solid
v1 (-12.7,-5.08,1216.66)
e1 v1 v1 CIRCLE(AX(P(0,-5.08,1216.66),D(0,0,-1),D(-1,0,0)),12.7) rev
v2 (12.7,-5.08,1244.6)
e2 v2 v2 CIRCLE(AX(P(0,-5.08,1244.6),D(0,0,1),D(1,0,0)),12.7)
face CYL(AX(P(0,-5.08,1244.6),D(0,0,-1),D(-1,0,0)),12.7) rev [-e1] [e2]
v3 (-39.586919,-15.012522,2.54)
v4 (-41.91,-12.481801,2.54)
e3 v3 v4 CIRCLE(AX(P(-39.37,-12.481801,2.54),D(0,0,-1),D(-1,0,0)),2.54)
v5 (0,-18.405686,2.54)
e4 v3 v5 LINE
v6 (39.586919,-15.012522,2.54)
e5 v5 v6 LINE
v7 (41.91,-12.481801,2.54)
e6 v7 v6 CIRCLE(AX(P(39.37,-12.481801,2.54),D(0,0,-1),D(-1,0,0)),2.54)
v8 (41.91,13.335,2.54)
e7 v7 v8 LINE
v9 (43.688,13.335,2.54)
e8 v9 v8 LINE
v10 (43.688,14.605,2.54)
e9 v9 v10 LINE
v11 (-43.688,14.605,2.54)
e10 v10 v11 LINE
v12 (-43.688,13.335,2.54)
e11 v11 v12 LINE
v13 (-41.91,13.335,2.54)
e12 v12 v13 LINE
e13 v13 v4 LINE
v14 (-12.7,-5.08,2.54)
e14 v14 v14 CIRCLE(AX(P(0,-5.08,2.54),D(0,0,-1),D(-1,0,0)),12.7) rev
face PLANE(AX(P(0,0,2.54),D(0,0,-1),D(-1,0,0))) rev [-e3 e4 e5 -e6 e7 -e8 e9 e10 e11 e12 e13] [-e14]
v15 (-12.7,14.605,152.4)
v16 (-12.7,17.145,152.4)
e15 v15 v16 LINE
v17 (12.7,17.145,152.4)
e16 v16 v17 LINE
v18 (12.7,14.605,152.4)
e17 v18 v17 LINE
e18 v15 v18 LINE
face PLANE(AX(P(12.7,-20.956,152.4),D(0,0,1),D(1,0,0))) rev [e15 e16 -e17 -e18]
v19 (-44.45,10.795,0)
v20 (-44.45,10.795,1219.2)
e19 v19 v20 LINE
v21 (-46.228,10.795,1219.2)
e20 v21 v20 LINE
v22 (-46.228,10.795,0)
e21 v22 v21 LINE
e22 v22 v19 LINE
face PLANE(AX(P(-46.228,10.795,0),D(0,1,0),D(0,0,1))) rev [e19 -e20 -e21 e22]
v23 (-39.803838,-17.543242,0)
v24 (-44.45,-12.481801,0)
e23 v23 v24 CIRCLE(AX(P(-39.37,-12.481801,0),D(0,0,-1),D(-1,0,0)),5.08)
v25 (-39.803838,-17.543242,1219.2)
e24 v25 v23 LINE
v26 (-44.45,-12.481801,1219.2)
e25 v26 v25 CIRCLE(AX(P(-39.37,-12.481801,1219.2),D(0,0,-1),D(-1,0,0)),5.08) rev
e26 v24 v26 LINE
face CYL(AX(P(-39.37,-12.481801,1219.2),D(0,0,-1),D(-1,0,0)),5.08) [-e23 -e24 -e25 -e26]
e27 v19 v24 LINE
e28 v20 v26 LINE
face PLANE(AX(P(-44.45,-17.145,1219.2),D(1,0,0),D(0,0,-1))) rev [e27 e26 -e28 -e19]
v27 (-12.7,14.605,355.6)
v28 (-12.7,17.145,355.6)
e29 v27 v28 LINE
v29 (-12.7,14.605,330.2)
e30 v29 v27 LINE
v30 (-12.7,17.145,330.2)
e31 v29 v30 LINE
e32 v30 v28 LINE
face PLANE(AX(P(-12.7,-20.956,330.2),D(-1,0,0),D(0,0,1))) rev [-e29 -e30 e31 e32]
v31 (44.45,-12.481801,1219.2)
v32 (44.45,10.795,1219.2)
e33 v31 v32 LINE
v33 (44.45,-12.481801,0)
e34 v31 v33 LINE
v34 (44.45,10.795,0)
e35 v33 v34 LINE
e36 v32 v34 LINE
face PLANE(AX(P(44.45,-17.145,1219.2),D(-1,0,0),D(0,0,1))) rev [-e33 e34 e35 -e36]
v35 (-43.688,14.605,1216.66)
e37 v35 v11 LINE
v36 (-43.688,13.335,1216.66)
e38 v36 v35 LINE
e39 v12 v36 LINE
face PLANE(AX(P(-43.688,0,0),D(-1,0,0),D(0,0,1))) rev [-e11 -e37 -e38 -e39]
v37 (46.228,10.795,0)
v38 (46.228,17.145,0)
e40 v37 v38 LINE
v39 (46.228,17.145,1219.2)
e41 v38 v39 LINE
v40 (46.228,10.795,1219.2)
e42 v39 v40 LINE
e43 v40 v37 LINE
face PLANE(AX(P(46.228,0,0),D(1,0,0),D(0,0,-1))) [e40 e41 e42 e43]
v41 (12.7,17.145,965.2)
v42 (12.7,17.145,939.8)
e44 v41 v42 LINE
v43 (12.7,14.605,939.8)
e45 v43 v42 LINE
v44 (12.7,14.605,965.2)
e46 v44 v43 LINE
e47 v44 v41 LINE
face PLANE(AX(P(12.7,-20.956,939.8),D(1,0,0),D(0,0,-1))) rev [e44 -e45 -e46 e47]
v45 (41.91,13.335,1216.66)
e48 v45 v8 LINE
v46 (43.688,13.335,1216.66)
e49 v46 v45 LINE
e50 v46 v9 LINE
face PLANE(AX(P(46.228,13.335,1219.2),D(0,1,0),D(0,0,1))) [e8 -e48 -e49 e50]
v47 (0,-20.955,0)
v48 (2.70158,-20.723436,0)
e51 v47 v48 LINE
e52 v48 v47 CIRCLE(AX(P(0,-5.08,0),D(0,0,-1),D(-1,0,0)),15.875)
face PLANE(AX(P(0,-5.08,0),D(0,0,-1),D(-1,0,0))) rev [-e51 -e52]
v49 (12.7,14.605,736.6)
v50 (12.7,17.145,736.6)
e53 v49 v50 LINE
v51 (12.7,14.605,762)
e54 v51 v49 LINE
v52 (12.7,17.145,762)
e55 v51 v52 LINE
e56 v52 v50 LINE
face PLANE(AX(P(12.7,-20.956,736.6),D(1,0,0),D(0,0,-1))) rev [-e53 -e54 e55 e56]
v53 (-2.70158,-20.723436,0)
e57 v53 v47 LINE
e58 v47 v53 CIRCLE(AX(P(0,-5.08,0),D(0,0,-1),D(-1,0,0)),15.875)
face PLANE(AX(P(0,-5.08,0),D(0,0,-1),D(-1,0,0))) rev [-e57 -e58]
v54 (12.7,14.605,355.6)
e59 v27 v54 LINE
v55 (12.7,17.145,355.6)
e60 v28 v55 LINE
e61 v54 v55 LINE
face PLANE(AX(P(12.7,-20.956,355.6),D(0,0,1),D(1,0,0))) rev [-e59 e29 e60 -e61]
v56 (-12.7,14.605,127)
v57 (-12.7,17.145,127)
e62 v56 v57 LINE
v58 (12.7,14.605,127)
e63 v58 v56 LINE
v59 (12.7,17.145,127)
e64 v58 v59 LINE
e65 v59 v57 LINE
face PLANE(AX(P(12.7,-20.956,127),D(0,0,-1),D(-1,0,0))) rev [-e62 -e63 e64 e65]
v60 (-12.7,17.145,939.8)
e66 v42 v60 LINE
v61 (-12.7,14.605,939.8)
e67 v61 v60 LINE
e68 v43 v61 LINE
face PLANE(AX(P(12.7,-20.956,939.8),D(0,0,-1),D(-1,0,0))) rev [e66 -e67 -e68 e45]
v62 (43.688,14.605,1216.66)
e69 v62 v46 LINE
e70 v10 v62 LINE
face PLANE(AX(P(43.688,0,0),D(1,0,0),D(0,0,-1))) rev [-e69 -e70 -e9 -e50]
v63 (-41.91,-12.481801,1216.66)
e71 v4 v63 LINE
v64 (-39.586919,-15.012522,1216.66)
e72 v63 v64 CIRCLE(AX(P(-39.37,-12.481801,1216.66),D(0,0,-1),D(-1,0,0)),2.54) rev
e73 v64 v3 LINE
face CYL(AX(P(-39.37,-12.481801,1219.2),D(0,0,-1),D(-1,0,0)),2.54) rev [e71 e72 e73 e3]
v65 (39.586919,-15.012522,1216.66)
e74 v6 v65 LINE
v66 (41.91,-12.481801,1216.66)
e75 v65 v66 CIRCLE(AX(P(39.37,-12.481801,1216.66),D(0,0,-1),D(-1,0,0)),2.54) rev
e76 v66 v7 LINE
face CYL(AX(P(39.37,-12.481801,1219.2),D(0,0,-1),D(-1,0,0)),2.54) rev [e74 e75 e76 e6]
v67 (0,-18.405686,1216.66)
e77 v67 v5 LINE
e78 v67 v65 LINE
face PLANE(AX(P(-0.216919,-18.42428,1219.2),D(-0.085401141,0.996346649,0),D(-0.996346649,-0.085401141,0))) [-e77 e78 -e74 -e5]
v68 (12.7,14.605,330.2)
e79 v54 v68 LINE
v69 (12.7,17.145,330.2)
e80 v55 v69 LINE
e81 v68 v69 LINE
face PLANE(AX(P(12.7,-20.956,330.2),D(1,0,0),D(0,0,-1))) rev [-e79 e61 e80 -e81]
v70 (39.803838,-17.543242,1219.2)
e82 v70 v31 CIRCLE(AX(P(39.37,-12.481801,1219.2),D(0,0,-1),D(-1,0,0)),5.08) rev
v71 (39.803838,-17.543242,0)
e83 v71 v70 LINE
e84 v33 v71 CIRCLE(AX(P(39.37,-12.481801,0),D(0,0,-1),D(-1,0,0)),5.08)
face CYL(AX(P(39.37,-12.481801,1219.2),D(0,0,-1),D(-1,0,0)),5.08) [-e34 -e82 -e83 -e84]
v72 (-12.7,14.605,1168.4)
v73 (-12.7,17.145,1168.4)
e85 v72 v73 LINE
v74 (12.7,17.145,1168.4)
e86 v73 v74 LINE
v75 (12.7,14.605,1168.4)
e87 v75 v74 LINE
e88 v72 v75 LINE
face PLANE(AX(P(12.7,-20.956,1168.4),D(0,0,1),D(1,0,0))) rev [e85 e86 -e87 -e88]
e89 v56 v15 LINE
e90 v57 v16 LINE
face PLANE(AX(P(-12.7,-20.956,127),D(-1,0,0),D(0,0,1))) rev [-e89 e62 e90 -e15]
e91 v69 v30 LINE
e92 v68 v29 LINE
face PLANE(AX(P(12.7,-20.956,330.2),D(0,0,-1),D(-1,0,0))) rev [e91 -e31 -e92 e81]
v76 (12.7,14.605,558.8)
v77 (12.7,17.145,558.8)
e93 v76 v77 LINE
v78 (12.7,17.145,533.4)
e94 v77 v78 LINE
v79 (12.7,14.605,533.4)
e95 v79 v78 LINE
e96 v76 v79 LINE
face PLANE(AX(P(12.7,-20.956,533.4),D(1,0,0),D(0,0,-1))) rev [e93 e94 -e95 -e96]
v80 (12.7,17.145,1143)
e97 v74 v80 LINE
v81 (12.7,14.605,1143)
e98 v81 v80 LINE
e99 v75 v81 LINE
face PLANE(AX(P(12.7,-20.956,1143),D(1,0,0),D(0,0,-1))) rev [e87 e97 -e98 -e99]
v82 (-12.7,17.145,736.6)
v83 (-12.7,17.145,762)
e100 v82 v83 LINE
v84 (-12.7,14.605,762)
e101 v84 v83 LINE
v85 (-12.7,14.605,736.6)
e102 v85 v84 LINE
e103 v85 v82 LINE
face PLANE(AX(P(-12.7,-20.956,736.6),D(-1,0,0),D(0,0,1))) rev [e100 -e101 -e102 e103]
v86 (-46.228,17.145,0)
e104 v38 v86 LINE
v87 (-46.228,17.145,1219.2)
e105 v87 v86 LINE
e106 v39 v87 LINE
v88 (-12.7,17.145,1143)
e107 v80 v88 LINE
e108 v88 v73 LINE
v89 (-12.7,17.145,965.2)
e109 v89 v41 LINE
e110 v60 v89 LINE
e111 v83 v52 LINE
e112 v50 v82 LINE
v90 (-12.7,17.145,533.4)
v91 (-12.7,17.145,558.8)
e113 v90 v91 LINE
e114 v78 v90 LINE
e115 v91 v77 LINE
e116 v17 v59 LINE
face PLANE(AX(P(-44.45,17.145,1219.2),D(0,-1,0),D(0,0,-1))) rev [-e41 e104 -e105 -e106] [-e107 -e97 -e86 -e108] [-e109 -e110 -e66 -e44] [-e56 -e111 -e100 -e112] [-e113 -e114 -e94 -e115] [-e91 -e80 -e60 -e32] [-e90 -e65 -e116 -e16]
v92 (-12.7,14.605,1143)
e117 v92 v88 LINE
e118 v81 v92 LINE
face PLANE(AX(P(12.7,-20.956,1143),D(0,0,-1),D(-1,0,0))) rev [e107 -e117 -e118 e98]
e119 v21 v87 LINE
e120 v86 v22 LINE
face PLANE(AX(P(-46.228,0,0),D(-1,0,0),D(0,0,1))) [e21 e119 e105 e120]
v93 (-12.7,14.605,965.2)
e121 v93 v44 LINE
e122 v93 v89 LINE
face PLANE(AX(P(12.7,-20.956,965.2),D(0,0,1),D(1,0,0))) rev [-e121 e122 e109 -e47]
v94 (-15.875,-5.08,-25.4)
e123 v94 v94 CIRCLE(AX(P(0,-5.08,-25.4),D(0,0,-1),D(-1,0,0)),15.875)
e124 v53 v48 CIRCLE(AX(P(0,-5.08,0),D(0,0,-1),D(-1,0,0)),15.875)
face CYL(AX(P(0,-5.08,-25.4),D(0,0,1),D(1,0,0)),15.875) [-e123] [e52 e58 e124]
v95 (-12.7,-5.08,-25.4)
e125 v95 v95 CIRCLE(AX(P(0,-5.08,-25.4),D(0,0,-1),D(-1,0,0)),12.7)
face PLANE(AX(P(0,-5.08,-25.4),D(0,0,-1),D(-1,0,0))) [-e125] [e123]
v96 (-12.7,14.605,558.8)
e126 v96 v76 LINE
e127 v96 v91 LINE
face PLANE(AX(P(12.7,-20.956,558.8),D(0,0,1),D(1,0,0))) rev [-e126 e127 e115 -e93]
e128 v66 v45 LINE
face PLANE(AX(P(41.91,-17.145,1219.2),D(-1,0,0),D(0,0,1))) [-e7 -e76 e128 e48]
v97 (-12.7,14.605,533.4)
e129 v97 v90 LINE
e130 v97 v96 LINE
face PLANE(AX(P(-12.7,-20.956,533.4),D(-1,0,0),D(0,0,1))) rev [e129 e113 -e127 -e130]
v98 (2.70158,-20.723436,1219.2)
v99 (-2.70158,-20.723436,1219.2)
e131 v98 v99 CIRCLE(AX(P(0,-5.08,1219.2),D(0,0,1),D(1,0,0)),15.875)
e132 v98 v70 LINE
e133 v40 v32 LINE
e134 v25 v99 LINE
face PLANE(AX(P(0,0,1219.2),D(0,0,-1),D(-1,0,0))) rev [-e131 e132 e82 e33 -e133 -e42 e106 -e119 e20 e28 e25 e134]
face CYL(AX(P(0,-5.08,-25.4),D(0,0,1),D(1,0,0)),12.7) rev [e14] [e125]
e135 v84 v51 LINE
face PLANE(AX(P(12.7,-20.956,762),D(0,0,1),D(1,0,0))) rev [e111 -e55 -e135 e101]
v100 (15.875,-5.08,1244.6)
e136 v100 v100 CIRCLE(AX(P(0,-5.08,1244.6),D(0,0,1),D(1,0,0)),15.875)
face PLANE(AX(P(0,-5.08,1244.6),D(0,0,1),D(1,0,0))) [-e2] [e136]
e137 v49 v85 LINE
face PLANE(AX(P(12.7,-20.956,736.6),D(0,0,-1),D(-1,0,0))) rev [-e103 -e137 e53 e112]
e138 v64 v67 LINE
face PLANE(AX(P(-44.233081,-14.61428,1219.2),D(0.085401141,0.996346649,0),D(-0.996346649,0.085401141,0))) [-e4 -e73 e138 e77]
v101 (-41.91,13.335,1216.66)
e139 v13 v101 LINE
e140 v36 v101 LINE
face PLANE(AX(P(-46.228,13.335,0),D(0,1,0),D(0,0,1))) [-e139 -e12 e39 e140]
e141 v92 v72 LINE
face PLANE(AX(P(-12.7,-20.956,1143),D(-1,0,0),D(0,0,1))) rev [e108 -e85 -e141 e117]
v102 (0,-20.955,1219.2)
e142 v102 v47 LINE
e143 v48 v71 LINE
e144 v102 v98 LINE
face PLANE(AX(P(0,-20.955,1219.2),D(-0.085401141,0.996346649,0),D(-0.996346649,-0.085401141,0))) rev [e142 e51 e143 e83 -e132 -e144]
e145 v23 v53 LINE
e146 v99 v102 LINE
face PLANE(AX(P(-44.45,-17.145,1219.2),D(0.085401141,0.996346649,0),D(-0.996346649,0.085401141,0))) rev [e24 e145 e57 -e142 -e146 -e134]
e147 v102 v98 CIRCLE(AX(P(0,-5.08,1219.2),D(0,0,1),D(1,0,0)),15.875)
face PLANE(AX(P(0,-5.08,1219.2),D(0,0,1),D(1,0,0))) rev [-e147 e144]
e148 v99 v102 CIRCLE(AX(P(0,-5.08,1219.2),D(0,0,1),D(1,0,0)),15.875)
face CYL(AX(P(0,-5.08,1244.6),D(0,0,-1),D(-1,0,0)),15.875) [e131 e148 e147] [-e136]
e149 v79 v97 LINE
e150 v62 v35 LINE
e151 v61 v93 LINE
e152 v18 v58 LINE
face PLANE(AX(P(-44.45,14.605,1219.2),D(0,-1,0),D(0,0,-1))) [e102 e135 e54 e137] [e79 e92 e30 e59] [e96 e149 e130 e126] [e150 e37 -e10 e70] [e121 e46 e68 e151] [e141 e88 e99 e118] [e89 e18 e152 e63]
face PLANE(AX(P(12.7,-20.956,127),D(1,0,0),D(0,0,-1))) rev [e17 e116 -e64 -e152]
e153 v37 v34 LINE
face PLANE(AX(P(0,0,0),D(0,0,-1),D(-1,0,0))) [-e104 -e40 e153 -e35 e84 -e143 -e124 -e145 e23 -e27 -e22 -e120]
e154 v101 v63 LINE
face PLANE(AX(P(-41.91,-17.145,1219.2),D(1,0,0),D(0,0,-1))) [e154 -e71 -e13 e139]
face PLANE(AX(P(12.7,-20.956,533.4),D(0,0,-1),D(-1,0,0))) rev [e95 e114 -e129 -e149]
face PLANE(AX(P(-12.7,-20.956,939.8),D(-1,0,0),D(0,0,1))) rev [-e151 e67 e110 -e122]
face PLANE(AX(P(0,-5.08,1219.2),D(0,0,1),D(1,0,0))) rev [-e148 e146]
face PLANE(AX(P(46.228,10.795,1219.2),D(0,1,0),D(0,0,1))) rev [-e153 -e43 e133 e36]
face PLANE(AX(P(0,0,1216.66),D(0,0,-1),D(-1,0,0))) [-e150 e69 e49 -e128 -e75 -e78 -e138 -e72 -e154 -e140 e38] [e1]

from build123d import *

# Parameters (mm, degrees)
BOSS_EXTRUDE1_DEPTH = 1219.2
SKETCH3_W           = 1219.2
SKETCH3_H           = 6.35
BOSS_EXTRUDE2_DEPTH = 1.778
SKETCH4_W           = 1219.2
SKETCH4_H           = 6.35
BOSS_EXTRUDE3_DEPTH = 1.778
FILLET1_R           = 5.08
SHELL1_START        = 2.54
SHELL1_DEPTH        = 1214.12
CUT_EXTRUDE1_REACH  = 1222.671
SKETCH6_W           = 25.4
SKETCH6_H           = 25.4
SKETCH7_R           = 15.875
SKETCH7_R_2         = 12.7
BOSS_EXTRUDE4_DEPTH = 25.4
CUT_EXTRUDE2_REACH  = 1222.256
SKETCH10_R          = 12.7
BOSS_EXTRUDE5_START = 25.4
SKETCH11_R          = 15.875
SKETCH11_R_2        = 12.7
BOSS_EXTRUDE5_DEPTH = 25.4
CUT_EXTRUDE3_REACH  = 1247.634
SKETCH12_R          = 12.7


# Read off the part's stored shape, not the designer's step: Shell1
with BuildPart() as part:
    # Sketch1 → Boss-Extrude1 (new body)
    with BuildSketch(Plane.XY):
        Polygon((-44.45, -17.145), (-44.45, 17.145), (44.45, 17.145), (44.45, -17.145), (0, -20.955), align=None)
    extrude(amount=BOSS_EXTRUDE1_DEPTH)

    # Sketch3 → Boss-Extrude2 (add)
    with BuildSketch(Plane.ZY.offset(44.45)):
        with Locations((609.6, 13.97)):
            Rectangle(SKETCH3_W, SKETCH3_H)
    extrude(amount=BOSS_EXTRUDE2_DEPTH)

    # Sketch4 → Boss-Extrude3 (add)
    with BuildSketch(Plane(origin=(44.45, 0, 0), x_dir=(0, 0, -1), z_dir=(1, 0, 0))):
        with Locations((-609.6, 13.97)):
            Rectangle(SKETCH4_W, SKETCH4_H)
    extrude(amount=BOSS_EXTRUDE3_DEPTH)

    # Fillet1
    fillet1_edges = [part.edges().sort_by_distance(p)[0] for p in [
        (44.45, -17.145, 609.6),
        (-44.45, -17.145, 609.6),
    ]]
    fillet(fillet1_edges, radius=FILLET1_R)

    # Shell1 outline → Shell1 (cut)
    with BuildSketch(Plane.XY.offset(SHELL1_START)):
        with BuildLine():
            Line((41.91, -12.481801497), (41.91, 13.335))
            Line((41.91, 13.335), (43.688, 13.335))
            Line((43.688, 13.335), (43.688, 14.605))
            Line((43.688, 14.605), (-43.688, 14.605))
            Line((-43.688, 14.605), (-43.688, 13.335))
            Line((-43.688, 13.335), (-41.91, 13.335))
            Line((-41.91, 13.335), (-41.91, -12.481801497))
            ThreePointArc((-41.91, -12.481801497), (-41.241172627, -14.199449016), (-39.586918899, -15.012521986))
            Line((-39.586918899, -15.012521986), (0, -18.405686463))
            Line((0, -18.405686463), (39.586918899, -15.012521986))
            ThreePointArc((39.586918899, -15.012521986), (41.241172627, -14.199449016), (41.91, -12.481801497))
        make_face()
    extrude(amount=SHELL1_DEPTH, mode=Mode.SUBTRACT)

    # Sketch6 → Cut-Extrude1 (cut, up to next)
    with BuildSketch(Plane(origin=(0, 17.145, 0), x_dir=(1, 0, 0), z_dir=(0, 1, 0)), mode=Mode.PRIVATE) as cut_extrude1_sk1:
        with Locations((0, -1155.7)):
            Rectangle(SKETCH6_W, SKETCH6_H)
    cut_extrude1_tool1 = extrude(cut_extrude1_sk1.sketch, amount=-CUT_EXTRUDE1_REACH, mode=Mode.PRIVATE) & part.part
    # Sketch6 → Cut-Extrude1 (cut, up to next)
    with BuildSketch(Plane(origin=(0, 17.145, 0), x_dir=(1, 0, 0), z_dir=(0, 1, 0)), mode=Mode.PRIVATE) as cut_extrude1_sk2:
        with Locations((0, -952.5)):
            Rectangle(SKETCH6_W, SKETCH6_H)
    cut_extrude1_tool2 = extrude(cut_extrude1_sk2.sketch, amount=-CUT_EXTRUDE1_REACH, mode=Mode.PRIVATE) & part.part
    # Sketch6 → Cut-Extrude1 (cut, up to next)
    with BuildSketch(Plane(origin=(0, 17.145, 0), x_dir=(1, 0, 0), z_dir=(0, 1, 0)), mode=Mode.PRIVATE) as cut_extrude1_sk3:
        with Locations((0, -749.3)):
            Rectangle(SKETCH6_W, SKETCH6_H)
    cut_extrude1_tool3 = extrude(cut_extrude1_sk3.sketch, amount=-CUT_EXTRUDE1_REACH, mode=Mode.PRIVATE) & part.part
    # Sketch6 → Cut-Extrude1 (cut, up to next)
    with BuildSketch(Plane(origin=(0, 17.145, 0), x_dir=(1, 0, 0), z_dir=(0, 1, 0)), mode=Mode.PRIVATE) as cut_extrude1_sk4:
        with Locations((0, -546.1)):
            Rectangle(SKETCH6_W, SKETCH6_H)
    cut_extrude1_tool4 = extrude(cut_extrude1_sk4.sketch, amount=-CUT_EXTRUDE1_REACH, mode=Mode.PRIVATE) & part.part
    # Sketch6 → Cut-Extrude1 (cut, up to next)
    with BuildSketch(Plane(origin=(0, 17.145, 0), x_dir=(1, 0, 0), z_dir=(0, 1, 0)), mode=Mode.PRIVATE) as cut_extrude1_sk5:
        with Locations((0, -342.9)):
            Rectangle(SKETCH6_W, SKETCH6_H)
    cut_extrude1_tool5 = extrude(cut_extrude1_sk5.sketch, amount=-CUT_EXTRUDE1_REACH, mode=Mode.PRIVATE) & part.part
    # Sketch6 → Cut-Extrude1 (cut, up to next)
    with BuildSketch(Plane(origin=(0, 17.145, 0), x_dir=(1, 0, 0), z_dir=(0, 1, 0)), mode=Mode.PRIVATE) as cut_extrude1_sk6:
        with Locations((0, -139.7)):
            Rectangle(SKETCH6_W, SKETCH6_H)
    cut_extrude1_tool6 = extrude(cut_extrude1_sk6.sketch, amount=-CUT_EXTRUDE1_REACH, mode=Mode.PRIVATE) & part.part
    add(cut_extrude1_tool1.solids().sort_by_distance((0, 17.145, 1155.7))[0], mode=Mode.SUBTRACT)
    add(cut_extrude1_tool2.solids().sort_by_distance((0, 17.145, 952.5))[0], mode=Mode.SUBTRACT)
    add(cut_extrude1_tool3.solids().sort_by_distance((0, 17.145, 749.3))[0], mode=Mode.SUBTRACT)
    add(cut_extrude1_tool4.solids().sort_by_distance((0, 17.145, 546.1))[0], mode=Mode.SUBTRACT)
    add(cut_extrude1_tool5.solids().sort_by_distance((0, 17.145, 342.9))[0], mode=Mode.SUBTRACT)
    add(cut_extrude1_tool6.solids().sort_by_distance((0, 17.145, 139.7))[0], mode=Mode.SUBTRACT)

    # Sketch7 → Boss-Extrude4 (add)
    with BuildSketch(Plane(origin=(0, 0, 0), x_dir=(-1, 0, 0), z_dir=(0, 0, -1))):
        with Locations(Location((0, -5.08, 0), (0, 0, 260.201815092))):
            Circle(SKETCH7_R)
        with Locations((0, -5.08)):
            Circle(SKETCH7_R_2, mode=Mode.SUBTRACT)
    extrude(amount=BOSS_EXTRUDE4_DEPTH)

    # Sketch10 → Cut-Extrude2 (cut, up to next)
    with BuildSketch(Plane(origin=(0, 0, 0), x_dir=(-1, 0, 0), z_dir=(0, 0, -1)), mode=Mode.PRIVATE) as cut_extrude2_sk1:
        with Locations((0, -5.08)):
            Circle(SKETCH10_R)
    cut_extrude2_tool1 = extrude(cut_extrude2_sk1.sketch, amount=-CUT_EXTRUDE2_REACH, mode=Mode.PRIVATE) & part.part
    add(cut_extrude2_tool1.solids().sort_by_distance((0, -5.08, 0))[0], mode=Mode.SUBTRACT)

    # Sketch11 → Boss-Extrude5 (add)
    with BuildSketch(Plane.XY.offset(1219.2).offset(BOSS_EXTRUDE5_START)):
        with Locations(Location((0, -5.08, 0), (0, 0, 279.798184908))):
            Circle(SKETCH11_R)
        with Locations(Location((0, -5.08, 0), (0, 0, 180))):
            Circle(SKETCH11_R_2, mode=Mode.SUBTRACT)
    extrude(amount=-BOSS_EXTRUDE5_DEPTH)

    # Sketch12 → Cut-Extrude3 (cut, up to next)
    with BuildSketch(Plane.XY.offset(1219.2), mode=Mode.PRIVATE) as cut_extrude3_sk1:
        with Locations(Location((0, -5.08, 0), (0, 0, 180))):
            Circle(SKETCH12_R)
    cut_extrude3_tool1 = extrude(cut_extrude3_sk1.sketch, amount=-CUT_EXTRUDE3_REACH, mode=Mode.PRIVATE) & part.part
    add(cut_extrude3_tool1.solids().sort_by_distance((0, -5.08, 1219.2))[0], mode=Mode.SUBTRACT)


solid = part.part
